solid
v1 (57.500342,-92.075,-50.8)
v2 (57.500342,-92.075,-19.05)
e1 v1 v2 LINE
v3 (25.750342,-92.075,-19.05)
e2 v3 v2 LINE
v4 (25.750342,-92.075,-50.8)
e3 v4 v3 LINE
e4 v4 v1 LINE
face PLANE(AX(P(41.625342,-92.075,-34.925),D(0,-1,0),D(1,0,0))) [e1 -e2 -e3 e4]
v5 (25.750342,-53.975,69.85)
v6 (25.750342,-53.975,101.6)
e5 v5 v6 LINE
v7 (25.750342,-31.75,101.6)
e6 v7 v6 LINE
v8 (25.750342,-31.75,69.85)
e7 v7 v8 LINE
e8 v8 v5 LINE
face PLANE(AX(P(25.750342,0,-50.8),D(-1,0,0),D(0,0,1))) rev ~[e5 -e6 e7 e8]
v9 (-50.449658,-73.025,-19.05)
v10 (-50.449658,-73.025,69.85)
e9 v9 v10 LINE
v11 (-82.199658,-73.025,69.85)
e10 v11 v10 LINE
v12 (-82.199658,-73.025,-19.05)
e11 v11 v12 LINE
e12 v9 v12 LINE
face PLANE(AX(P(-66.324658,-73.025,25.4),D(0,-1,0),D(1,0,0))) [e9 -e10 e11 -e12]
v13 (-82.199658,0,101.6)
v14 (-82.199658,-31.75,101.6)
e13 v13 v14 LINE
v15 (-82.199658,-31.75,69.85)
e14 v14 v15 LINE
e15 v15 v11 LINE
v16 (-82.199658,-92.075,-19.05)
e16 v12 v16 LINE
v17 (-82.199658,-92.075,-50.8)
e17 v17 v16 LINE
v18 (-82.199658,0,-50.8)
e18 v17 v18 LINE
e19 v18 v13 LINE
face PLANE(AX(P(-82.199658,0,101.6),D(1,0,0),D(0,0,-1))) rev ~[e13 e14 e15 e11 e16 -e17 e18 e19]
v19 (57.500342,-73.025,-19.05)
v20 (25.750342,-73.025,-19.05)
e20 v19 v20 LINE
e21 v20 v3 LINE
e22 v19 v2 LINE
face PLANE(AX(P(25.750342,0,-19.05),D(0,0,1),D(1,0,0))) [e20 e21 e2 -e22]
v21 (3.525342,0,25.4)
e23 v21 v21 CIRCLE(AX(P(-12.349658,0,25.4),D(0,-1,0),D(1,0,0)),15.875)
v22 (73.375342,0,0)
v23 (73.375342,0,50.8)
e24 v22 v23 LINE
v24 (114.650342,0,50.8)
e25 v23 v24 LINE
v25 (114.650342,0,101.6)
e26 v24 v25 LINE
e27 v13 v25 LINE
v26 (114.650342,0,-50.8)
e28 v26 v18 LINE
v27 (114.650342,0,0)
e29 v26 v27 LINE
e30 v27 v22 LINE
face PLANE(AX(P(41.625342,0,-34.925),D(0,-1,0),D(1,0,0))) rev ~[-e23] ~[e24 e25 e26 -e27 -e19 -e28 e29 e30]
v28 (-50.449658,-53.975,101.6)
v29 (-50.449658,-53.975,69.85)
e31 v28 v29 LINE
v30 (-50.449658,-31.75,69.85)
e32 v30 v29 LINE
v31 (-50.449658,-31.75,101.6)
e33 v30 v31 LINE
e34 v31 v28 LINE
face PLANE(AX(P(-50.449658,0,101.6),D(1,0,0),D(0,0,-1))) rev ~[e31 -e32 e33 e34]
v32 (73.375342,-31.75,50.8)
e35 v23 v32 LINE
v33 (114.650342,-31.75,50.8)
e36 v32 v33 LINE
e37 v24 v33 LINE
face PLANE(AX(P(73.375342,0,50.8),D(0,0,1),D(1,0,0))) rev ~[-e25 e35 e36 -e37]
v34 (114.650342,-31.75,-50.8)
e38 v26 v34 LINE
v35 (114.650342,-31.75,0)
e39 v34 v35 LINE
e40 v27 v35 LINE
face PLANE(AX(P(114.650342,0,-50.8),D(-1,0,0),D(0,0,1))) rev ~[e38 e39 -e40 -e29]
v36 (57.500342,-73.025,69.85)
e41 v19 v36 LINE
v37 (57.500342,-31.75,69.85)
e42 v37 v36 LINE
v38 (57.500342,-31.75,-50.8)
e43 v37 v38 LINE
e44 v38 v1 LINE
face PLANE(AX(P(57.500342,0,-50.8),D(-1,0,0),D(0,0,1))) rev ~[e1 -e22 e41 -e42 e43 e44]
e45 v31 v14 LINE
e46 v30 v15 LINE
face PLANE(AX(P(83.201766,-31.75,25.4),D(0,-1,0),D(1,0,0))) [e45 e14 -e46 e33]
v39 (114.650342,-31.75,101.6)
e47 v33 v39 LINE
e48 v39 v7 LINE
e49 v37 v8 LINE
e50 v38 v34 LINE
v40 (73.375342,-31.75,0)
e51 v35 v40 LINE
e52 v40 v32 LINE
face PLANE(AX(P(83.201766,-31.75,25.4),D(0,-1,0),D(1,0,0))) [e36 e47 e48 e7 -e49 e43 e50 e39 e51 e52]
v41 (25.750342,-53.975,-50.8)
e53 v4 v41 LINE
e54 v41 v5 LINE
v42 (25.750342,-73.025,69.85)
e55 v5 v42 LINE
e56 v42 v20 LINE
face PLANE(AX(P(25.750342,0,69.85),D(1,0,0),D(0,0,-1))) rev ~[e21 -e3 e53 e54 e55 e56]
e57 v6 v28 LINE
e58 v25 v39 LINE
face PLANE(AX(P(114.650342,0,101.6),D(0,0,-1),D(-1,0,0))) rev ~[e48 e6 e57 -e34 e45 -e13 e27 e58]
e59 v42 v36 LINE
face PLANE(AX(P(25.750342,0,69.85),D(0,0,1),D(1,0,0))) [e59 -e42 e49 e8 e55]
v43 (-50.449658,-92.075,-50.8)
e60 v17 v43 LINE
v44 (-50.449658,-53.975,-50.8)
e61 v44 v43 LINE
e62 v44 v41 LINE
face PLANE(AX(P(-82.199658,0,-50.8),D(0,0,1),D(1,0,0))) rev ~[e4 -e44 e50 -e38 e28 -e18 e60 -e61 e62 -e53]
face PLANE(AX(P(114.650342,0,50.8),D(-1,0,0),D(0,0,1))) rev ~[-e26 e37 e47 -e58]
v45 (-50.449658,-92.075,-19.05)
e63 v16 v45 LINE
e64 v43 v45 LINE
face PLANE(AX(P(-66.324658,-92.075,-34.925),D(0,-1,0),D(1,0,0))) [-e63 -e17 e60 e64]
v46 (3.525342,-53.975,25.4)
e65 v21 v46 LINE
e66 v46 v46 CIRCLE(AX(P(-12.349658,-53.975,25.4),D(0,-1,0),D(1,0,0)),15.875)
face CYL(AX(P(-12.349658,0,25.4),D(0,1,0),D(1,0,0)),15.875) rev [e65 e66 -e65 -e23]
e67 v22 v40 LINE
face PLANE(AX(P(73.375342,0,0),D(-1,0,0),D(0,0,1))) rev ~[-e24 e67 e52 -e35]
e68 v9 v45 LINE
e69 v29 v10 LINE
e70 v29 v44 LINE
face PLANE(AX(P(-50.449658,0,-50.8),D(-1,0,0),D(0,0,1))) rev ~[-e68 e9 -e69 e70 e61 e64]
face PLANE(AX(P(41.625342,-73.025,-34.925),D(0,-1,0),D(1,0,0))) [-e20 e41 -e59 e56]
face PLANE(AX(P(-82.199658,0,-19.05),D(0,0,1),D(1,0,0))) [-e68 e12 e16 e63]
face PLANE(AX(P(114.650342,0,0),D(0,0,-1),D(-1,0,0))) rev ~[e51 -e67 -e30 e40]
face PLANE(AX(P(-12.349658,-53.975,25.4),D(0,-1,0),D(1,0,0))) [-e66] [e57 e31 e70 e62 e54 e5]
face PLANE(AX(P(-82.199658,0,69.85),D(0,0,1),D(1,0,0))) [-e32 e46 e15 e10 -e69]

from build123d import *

# Parameters (mm, degrees)
F0_W     = 31.75
F0_H     = 88.9
F0_H_2   = 31.75
F0_R     = 15.875
F1_DEPTH = 31.75
F2_DEPTH = 73.025
F3_DEPTH = 73.025
F4_DEPTH = 92.075
F5_DEPTH = 53.975


# Not quite as in the source:
# - a feature names something its author has since deleted; it is built from what else it names


with BuildPart() as f1:
    # F0 (on Front) → F1 (new body)
    with BuildSketch(Plane.XZ):
        Polygon((114.6503422856, 101.6), (57.5003422856, 101.6), (57.5003422856, 69.85), (57.5003422856, -19.05), (57.5003422856, -50.8), (114.6503422856, -50.8), (114.6503422856, 0), (73.3753422856, 0), (73.3753422856, 50.8), (114.6503422856, 50.8), align=None)
        with Locations((41.6253422856, 25.4)):
            Rectangle(F0_W, F0_H)
        with Locations((41.6253422856, -34.925)):
            Rectangle(F0_W, F0_H_2)
        Polygon((-12.3496577144, 101.6), (-50.4496577144, 101.6), (-50.4496577144, 69.85), (-50.4496577144, -19.05), (-50.4496577144, -50.8), (25.7503422856, -50.8), (25.7503422856, -19.05), (25.7503422856, 69.85), (25.7503422856, 101.6), align=None)
        with Locations((-12.3496577144, 25.4)):
            Circle(F0_R, mode=Mode.SUBTRACT)
        with Locations((-66.3246577144, 25.4)):
            Rectangle(F0_W, F0_H)
        with Locations((-66.3246577144, -34.925)):
            Rectangle(F0_W, F0_H_2)
        with Locations((-66.3246577144, 85.725)):
            Rectangle(F0_W, F0_H_2)
        with Locations((41.6253422856, 85.725)):
            Rectangle(F0_W, F0_H_2)
    extrude(amount=F1_DEPTH)

    # F0 (on Front) → F2 (join)
    with BuildSketch(Plane.XZ):
        with Locations((-66.3246577144, 25.4)):
            Rectangle(F0_W, F0_H)
        with Locations((-66.3246577144, -34.925)):
            Rectangle(F0_W, F0_H_2)
    extrude(amount=F2_DEPTH)

    # F0 (on Front) → F3 (join)
    with BuildSketch(Plane.XZ):
        with Locations((41.6253422856, -34.925)):
            Rectangle(F0_W, F0_H_2)
        with Locations((41.6253422856, 25.4)):
            Rectangle(F0_W, F0_H)
    extrude(amount=F3_DEPTH)

    # F0 (on Front) → F4 (join)
    with BuildSketch(Plane.XZ):
        with Locations((-66.3246577144, -34.925)):
            Rectangle(F0_W, F0_H_2)
        with Locations((41.6253422856, -34.925)):
            Rectangle(F0_W, F0_H_2)
    extrude(amount=F4_DEPTH)

    # F0 (on Front) → F5 (join)
    with BuildSketch(Plane.XZ):
        Polygon((-12.3496577144, 101.6), (-50.4496577144, 101.6), (-50.4496577144, 69.85), (-50.4496577144, -19.05), (-50.4496577144, -50.8), (25.7503422856, -50.8), (25.7503422856, -19.05), (25.7503422856, 69.85), (25.7503422856, 101.6), align=None)
        with Locations((-12.3496577144, 25.4)):
            Circle(F0_R, mode=Mode.SUBTRACT)
    extrude(amount=F5_DEPTH)


solid = f1.part
